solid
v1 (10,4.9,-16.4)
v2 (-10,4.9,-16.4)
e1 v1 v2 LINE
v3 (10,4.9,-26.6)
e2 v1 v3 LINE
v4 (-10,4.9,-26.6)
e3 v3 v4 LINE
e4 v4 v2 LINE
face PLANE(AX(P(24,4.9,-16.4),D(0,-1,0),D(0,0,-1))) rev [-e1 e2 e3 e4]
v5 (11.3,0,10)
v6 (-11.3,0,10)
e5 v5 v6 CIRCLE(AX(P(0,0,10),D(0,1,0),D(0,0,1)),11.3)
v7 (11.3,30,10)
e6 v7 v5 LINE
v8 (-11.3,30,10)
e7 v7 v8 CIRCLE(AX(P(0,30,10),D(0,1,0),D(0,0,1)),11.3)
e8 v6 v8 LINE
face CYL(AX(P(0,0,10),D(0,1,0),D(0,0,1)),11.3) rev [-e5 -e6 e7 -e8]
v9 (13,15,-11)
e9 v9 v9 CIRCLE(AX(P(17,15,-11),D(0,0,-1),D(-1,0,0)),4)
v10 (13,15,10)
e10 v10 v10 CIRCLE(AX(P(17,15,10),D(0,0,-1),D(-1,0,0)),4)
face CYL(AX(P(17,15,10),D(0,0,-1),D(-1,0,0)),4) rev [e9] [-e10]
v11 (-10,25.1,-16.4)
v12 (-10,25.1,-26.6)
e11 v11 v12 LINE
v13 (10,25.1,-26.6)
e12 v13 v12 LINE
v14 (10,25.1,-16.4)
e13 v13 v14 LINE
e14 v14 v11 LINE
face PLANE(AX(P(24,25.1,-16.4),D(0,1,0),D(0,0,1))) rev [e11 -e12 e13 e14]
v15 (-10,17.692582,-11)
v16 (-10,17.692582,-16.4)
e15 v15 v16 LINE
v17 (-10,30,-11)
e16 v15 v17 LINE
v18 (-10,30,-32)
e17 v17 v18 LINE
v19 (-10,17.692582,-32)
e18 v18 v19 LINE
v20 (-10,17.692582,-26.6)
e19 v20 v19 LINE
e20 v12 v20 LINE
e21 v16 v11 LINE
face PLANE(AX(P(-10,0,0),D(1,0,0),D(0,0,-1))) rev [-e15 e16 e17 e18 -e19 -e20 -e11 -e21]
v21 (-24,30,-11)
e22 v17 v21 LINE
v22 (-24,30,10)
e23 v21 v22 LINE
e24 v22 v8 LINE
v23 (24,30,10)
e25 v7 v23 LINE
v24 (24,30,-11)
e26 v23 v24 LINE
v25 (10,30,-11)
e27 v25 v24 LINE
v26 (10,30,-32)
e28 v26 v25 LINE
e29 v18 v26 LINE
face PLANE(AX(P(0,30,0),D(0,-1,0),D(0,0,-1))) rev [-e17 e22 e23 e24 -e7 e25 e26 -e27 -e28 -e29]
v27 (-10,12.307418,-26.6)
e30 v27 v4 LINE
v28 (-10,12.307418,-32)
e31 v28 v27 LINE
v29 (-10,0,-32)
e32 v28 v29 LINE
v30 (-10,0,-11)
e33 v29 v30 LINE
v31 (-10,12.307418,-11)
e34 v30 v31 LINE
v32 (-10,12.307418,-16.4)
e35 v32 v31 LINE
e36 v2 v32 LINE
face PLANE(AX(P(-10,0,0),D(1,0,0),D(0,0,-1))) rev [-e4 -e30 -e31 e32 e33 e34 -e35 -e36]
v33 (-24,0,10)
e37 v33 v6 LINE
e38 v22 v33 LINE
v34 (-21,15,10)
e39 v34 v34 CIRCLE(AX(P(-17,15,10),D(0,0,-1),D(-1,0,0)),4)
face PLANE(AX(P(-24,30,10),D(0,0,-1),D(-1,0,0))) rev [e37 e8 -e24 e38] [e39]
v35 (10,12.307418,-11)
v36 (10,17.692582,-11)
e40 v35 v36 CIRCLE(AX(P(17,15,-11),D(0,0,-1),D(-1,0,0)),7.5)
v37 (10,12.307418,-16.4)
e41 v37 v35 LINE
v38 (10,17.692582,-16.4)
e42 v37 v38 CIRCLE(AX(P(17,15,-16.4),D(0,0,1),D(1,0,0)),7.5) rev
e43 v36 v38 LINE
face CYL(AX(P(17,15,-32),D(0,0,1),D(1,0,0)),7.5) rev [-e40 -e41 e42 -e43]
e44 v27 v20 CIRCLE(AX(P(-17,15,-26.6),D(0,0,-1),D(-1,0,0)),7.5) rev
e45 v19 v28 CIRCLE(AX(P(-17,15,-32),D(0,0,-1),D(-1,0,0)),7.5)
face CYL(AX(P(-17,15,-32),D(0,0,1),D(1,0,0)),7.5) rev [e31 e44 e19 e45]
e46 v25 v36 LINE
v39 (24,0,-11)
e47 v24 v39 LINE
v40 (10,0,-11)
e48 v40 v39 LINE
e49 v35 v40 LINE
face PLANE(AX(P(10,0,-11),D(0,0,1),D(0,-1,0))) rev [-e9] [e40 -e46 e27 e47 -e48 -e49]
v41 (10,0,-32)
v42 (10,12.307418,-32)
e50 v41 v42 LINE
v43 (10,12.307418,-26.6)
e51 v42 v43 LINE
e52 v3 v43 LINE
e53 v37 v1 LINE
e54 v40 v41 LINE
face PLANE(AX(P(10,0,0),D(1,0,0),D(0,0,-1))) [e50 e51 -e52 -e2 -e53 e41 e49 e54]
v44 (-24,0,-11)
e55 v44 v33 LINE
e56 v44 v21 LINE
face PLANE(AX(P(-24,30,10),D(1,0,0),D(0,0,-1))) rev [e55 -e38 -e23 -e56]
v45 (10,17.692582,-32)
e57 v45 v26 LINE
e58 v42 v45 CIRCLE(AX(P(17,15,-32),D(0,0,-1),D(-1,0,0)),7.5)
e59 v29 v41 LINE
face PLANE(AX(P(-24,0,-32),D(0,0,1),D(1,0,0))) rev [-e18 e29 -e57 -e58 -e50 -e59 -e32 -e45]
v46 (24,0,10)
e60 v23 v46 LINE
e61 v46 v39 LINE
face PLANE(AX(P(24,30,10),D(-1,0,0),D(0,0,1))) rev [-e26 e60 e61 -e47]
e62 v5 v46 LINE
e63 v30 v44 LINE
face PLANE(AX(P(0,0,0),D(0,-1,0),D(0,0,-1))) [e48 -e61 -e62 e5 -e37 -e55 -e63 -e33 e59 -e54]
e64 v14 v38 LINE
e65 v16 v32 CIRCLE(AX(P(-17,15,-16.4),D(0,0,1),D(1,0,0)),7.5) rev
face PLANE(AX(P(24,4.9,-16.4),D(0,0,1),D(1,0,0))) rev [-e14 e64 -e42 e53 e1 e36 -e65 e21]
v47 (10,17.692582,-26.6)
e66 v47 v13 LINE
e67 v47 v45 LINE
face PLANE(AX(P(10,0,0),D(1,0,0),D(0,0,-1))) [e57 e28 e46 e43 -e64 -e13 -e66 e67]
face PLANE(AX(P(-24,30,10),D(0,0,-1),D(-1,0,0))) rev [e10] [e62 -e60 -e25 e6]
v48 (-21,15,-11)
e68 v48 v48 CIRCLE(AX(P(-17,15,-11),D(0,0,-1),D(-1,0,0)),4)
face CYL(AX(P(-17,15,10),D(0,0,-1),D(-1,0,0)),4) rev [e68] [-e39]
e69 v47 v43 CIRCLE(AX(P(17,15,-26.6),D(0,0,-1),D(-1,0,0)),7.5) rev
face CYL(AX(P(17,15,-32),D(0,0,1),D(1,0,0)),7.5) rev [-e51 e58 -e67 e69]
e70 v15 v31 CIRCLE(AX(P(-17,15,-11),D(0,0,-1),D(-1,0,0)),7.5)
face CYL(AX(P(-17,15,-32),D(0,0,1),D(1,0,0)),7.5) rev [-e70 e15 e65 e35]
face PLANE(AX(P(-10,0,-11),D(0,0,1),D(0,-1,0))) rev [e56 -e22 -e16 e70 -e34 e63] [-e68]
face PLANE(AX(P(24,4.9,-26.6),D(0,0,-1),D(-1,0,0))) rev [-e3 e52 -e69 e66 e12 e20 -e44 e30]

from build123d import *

# Parameters (mm, degrees)
SKETCH_1_W          = 48
SKETCH_1_H          = 20
EXTRUDE_1_DEPTH     = 30
SKETCH_2_W          = 14
SKETCH_2_H          = 30
CUT_EXTRUDE_1_DEPTH = 7
SKETCH_7_W          = 22
SKETCH_7_H          = 30
EXTRUDE_2_DEPTH     = 48
SKETCH_8_W          = 21
SKETCH_8_H          = 30
CUT_EXTRUDE_2_DEPTH = 14
SKETCH_9_W          = 21
SKETCH_9_H          = 30
CUT_EXTRUDE_3_DEPTH = 14
SKETCH_11_W         = 10.2
SKETCH_11_H         = 20.2
CUT_EXTRUDE_4_DEPTH = 56.497747702
SKETCH_13_R         = 4
CUT_EXTRUDE_5_DEPTH = 44.783558558
SKETCH_14_R         = 4
CUT_EXTRUDE_6_DEPTH = 44.783558558
FILLET_1_R          = 7
SKETCH_20_R         = 7.5
CUT_EXTRUDE_8_DEPTH = 44.783558558
SKETCH2_R           = 11.3
CUT_EXTRUDE1_DEPTH  = 51


with BuildPart() as part:
    # Эскиз1 → Бобышка-Вытянуть1 (new body)
    with BuildSketch(Plane(origin=(0, 0, 0), x_dir=(1, 0, 0), z_dir=(0, 1, 0))):
        Rectangle(SKETCH_1_W, SKETCH_1_H)
    extrude(amount=EXTRUDE_1_DEPTH)

    # Эскиз2 → Вырез-Вытянуть1 (cut)
    with BuildSketch(Plane.XY.offset(10)):
        with Locations((0, 15)):
            Rectangle(SKETCH_2_W, SKETCH_2_H)
    extrude(amount=-CUT_EXTRUDE_1_DEPTH, mode=Mode.SUBTRACT)

    # Эскиз7 → Бобышка-Вытянуть2 (add)
    with BuildSketch(Plane(origin=(24, 0, 0), x_dir=(0, 0, -1), z_dir=(1, 0, 0))):
        with Locations((21, 15)):
            Rectangle(SKETCH_7_W, SKETCH_7_H)
    extrude(amount=-EXTRUDE_2_DEPTH)

    # Эскиз8 → Вырез-Вытянуть2 (cut)
    with BuildSketch(Plane(origin=(24, 0, 0), x_dir=(0, 0, -1), z_dir=(1, 0, 0))):
        with Locations((21.5, 15)):
            Rectangle(SKETCH_8_W, SKETCH_8_H)
    extrude(amount=-CUT_EXTRUDE_2_DEPTH, mode=Mode.SUBTRACT)

    # Эскиз9 → Вырез-Вытянуть3 (cut)
    with BuildSketch(Plane.ZY.offset(24)):
        with Locations((-21.5, 15)):
            Rectangle(SKETCH_9_W, SKETCH_9_H)
    extrude(amount=-CUT_EXTRUDE_3_DEPTH, mode=Mode.SUBTRACT)

    # Эскиз11 → Вырез-Вытянуть4 (cut, through all)
    with BuildSketch(Plane.ZY.offset(10)):
        with Locations((-21.5, 15)):
            Rectangle(SKETCH_11_W, SKETCH_11_H)
    extrude(amount=-CUT_EXTRUDE_4_DEPTH, mode=Mode.SUBTRACT)

    # Эскиз13 → Вырез-Вытянуть5 (cut, through all)
    with BuildSketch(Plane(origin=(0, 0, -11), x_dir=(-1, 0, 0), z_dir=(0, 0, -1))):
        with Locations((17, 15)):
            Circle(SKETCH_13_R)
    extrude(amount=-CUT_EXTRUDE_5_DEPTH, mode=Mode.SUBTRACT)

    # Эскиз14 → Вырез-Вытянуть6 (cut, through all)
    with BuildSketch(Plane(origin=(0, 0, -11), x_dir=(-1, 0, 0), z_dir=(0, 0, -1))):
        with Locations((-17, 15)):
            Circle(SKETCH_14_R)
    extrude(amount=-CUT_EXTRUDE_6_DEPTH, mode=Mode.SUBTRACT)

    # Скругление1
    fillet_1_edges = [part.edges().sort_by_distance(p)[0] for p in [
        (-7, 15, 3),
        (7, 15, 3),
    ]]
    fillet(fillet_1_edges, radius=FILLET_1_R - 0.0001)  # a hair under: the kernel refuses the full size

    # Эскиз20 → Вырез-Вытянуть8 (cut, through all)
    with BuildSketch(Plane(origin=(0, 0, -11), x_dir=(-1, 0, 0), z_dir=(0, 0, -1))):
        with Locations((-17, 15)):
            Circle(SKETCH_20_R)
        with Locations((17, 15)):
            Circle(SKETCH_20_R)
    extrude(amount=CUT_EXTRUDE_8_DEPTH, mode=Mode.SUBTRACT)

    # Sketch2 → Cut-Extrude1 (cut, through all)
    with BuildSketch(Plane(origin=(0, 30, 0), x_dir=(1, 0, 0), z_dir=(0, 1, 0))):
        with Locations((0, -10)):
            Circle(SKETCH2_R)
    extrude(amount=-CUT_EXTRUDE1_DEPTH, mode=Mode.SUBTRACT)


solid = part.part
